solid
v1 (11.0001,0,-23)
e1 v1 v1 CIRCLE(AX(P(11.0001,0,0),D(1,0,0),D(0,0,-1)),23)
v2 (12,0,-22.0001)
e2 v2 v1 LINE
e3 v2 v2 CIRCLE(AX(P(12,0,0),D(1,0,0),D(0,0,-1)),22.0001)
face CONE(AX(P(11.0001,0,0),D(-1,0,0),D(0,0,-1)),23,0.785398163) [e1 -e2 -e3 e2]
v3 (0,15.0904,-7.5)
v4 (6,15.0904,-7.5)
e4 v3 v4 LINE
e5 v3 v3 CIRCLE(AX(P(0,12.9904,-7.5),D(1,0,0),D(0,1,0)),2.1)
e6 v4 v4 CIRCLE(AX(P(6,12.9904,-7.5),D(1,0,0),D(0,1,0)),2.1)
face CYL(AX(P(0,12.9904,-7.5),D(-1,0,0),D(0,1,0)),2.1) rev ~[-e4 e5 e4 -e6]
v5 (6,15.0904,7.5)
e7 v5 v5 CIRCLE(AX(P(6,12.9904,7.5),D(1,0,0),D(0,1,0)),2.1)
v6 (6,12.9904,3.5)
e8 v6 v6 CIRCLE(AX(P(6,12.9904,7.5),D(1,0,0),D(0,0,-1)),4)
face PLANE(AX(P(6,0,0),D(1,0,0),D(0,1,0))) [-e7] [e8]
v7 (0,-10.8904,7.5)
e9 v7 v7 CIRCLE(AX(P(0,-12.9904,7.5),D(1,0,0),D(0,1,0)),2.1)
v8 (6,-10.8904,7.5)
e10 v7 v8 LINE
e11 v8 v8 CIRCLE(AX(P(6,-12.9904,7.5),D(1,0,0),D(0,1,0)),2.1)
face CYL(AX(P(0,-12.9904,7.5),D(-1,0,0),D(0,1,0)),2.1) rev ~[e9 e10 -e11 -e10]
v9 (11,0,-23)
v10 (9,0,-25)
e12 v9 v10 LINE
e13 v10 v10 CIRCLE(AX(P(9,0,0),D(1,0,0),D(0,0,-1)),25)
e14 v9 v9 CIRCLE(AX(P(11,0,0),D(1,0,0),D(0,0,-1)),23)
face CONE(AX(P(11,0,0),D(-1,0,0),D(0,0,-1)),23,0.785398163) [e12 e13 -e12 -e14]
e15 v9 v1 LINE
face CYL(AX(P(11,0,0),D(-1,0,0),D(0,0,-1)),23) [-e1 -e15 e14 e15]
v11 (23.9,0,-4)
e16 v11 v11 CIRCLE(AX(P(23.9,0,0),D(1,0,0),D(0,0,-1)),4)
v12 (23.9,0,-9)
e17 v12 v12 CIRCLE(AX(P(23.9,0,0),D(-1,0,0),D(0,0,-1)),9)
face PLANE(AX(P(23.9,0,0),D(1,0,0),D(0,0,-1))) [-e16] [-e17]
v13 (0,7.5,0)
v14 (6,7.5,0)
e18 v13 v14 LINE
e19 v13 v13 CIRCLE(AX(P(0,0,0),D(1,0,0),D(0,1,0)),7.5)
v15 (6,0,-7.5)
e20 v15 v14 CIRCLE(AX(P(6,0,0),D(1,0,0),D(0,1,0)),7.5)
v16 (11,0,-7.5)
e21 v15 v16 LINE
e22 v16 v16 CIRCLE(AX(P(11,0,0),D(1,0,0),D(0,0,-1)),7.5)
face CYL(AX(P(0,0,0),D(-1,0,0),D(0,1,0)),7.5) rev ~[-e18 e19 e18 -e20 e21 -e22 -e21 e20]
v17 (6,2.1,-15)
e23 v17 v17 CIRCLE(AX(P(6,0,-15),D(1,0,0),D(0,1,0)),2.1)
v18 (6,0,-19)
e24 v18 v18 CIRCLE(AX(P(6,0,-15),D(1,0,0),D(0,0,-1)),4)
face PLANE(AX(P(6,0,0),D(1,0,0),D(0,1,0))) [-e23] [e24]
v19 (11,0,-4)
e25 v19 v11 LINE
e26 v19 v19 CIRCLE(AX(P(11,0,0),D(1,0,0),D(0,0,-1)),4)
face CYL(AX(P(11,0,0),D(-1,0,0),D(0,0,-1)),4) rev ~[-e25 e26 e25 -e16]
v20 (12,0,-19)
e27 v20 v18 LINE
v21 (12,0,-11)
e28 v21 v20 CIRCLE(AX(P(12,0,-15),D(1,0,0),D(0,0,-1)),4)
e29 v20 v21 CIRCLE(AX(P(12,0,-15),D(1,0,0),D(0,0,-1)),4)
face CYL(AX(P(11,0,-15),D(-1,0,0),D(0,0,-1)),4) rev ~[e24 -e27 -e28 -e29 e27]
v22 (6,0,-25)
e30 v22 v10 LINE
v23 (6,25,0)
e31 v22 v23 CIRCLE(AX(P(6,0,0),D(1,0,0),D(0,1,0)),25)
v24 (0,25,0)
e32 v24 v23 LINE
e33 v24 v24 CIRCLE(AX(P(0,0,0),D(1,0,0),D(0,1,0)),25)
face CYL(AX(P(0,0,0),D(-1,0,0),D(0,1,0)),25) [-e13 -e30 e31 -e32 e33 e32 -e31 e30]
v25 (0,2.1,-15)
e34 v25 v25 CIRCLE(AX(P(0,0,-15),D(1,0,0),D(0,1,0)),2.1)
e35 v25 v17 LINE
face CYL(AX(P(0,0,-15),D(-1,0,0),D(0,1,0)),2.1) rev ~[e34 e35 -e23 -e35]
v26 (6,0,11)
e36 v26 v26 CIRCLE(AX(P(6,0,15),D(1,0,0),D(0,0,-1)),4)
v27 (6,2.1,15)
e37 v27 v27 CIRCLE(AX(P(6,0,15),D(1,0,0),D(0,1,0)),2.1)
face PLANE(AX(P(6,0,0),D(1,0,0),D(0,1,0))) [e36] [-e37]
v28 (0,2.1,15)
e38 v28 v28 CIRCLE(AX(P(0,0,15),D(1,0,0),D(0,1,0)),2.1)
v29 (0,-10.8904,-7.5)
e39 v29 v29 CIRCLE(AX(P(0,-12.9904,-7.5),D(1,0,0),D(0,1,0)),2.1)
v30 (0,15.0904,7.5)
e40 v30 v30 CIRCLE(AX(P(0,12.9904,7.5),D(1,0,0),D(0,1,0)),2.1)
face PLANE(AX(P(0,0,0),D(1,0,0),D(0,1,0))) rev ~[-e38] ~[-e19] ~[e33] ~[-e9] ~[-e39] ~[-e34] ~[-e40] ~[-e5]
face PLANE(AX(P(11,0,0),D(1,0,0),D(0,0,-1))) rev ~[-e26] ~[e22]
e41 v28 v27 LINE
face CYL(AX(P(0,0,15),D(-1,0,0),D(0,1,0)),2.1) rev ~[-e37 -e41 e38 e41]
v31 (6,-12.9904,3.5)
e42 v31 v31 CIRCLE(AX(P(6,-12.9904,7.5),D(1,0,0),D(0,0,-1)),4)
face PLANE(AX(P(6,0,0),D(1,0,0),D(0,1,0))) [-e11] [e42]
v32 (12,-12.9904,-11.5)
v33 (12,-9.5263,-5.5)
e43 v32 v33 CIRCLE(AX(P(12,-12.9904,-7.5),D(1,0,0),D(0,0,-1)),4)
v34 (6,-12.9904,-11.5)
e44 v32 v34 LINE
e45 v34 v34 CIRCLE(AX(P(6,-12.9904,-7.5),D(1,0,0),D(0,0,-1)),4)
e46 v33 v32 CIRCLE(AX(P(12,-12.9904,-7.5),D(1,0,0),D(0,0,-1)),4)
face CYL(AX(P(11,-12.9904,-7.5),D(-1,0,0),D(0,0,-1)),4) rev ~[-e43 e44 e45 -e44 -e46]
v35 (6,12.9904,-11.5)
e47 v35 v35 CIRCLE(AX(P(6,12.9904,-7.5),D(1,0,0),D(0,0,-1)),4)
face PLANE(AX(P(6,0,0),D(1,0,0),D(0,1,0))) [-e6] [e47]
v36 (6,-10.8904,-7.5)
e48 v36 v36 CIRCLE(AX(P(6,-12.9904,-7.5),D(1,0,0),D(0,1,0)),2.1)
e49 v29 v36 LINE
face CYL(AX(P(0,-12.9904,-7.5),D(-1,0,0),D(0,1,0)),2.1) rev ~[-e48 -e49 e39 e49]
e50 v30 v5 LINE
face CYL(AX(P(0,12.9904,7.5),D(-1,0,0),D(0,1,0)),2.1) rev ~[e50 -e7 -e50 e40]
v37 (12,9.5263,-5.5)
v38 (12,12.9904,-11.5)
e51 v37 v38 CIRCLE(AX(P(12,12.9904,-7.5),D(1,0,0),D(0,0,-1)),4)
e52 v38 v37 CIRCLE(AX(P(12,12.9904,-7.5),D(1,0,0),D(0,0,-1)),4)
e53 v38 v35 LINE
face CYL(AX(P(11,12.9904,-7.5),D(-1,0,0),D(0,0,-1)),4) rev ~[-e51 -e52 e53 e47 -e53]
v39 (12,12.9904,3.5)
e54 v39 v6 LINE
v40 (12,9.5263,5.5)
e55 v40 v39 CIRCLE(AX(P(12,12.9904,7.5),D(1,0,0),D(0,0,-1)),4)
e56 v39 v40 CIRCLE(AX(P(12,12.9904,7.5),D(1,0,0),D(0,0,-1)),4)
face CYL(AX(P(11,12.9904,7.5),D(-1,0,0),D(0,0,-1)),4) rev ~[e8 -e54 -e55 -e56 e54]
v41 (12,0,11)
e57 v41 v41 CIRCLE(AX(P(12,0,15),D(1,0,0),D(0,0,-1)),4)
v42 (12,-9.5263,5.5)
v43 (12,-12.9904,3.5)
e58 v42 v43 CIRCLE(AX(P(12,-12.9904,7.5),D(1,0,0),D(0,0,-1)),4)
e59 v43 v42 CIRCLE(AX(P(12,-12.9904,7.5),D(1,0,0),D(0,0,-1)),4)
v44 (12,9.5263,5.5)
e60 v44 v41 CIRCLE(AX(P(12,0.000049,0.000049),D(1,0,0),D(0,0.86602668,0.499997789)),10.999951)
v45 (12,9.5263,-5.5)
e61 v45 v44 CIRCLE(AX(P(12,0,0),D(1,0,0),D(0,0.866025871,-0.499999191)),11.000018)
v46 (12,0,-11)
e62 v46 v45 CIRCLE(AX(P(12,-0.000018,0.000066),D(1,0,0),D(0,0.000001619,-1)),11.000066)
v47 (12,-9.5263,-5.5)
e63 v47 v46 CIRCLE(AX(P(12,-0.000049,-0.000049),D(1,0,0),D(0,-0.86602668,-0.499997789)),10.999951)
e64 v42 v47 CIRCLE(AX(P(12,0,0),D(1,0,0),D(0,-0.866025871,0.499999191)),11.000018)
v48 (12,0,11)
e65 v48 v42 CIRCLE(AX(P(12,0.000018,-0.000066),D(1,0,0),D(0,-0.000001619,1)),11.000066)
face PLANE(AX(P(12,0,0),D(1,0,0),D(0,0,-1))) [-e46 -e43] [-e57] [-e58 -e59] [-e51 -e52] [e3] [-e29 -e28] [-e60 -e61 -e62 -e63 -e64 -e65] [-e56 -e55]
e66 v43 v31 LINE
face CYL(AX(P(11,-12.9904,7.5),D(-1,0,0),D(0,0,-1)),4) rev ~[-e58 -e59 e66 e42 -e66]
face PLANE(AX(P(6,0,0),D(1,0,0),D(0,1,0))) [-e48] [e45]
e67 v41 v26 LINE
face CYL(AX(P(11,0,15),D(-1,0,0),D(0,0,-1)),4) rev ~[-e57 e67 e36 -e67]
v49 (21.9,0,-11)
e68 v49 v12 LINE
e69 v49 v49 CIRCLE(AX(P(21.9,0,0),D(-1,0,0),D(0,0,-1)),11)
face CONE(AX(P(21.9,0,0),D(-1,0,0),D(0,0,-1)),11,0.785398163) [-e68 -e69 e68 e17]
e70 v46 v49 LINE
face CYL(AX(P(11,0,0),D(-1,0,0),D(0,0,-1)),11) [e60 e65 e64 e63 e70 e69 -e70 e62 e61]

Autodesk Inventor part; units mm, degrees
ref_plane "YZ Plane" through (0, 0, 0) normal (1, 0, 0) x (0, 1, 0)
ref_plane "XZ Plane" through (0, 0, 0) normal (0, 1, 0) x (-1, 0, 0)
ref_plane "XY Plane" through (0, 0, 0) normal (0, 0, 1) x (1, 0, 0)
sketch "草图1" plane through (0, 0, 0) normal (1, 0, 0) x (0, 1, 0)
  circle A0 centre (0, 0) radius 25
  circle A1 centre (0, 0) radius 7.5
  circle A2 centre (0, 0) radius 15 construction
  circle A3 centre (0, -15) radius 2.1
  line L0 (0, 0) -> (0, -7.5) construction
  circle A4 centre (12.9904, -7.5) radius 2.1
  circle A5 centre (12.9904, 7.5) radius 2.1
  circle A6 centre (0, 15) radius 2.1
  circle A7 centre (-12.9904, 7.5) radius 2.1
  circle A8 centre (-12.9904, -7.5) radius 2.1
  dimension "d1" = 15
  dimension "d4" = 30
  dimension "d0" = 50
  dimension "d5" = 4.2
  dimension "d8" = 360
extrude "拉伸1" add sketch "草图1" along normal blind 6
sketch "草图2" plane through (6, 0, 0) normal (1, 0, 0) x (0, 0, -1)
  circle A0 centre (0, 0) radius 25 projected
  circle A1 centre (7.5, 12.9904) radius 2.1 projected
  circle A2 centre (15, 0) radius 2.1 projected
  circle A3 centre (7.5, -12.9904) radius 2.1 projected
  circle A4 centre (-7.5, -12.9904) radius 2.1 projected
  circle A5 centre (0, 0) radius 7.5 projected
  circle A6 centre (-15, 0) radius 2.1 projected
  circle A7 centre (-7.5, 12.9904) radius 2.1 projected
  circle A8 centre (15, 0) radius 4
  circle A9 centre (7.5, 12.9904) radius 4
  circle A10 centre (-7.5, 12.9904) radius 4
  circle A11 centre (-15, 0) radius 4
  circle A12 centre (-7.5, -12.9904) radius 4
  circle A13 centre (7.5, -12.9904) radius 4
  dimension "d10" = 8
  dimension "d13" = 360
extrude "拉伸2" add sketch "草图2" along normal blind 5 contours A0
sketch "草图3" plane through (11, 0, 0) normal (1, 0, 0) x (0, 0, -1)
  circle A0 centre (0, 0) radius 4
  circle A1 centre (0, 0) radius 25 projected
  circle A2 centre (7.5, -12.9904) radius 4 projected
  circle A3 centre (15, 0) radius 4 projected
  circle A4 centre (7.5, 12.9904) radius 4 projected
  circle A5 centre (-7.5, 12.9904) radius 4 projected
  circle A6 centre (-15, 0) radius 4 projected
  circle A7 centre (-7.5, -12.9904) radius 4 projected
  circle A8 centre (0, 0) radius 11
  dimension "d17" = 8
extrude "拉伸3" add sketch "草图3" along normal blind 12.9 contours A8
chamfer "倒角1" distance 2 angle 45 1 edges at (23.9, 0, 11)
chamfer "倒角2" distance 2 angle 45 1 edges at (11, 0, 25)
sketch "草图4" plane through (11, 0, 0) normal (1, 0, 0) x (0, 0, -1)
  circle A0 centre (-15, 0) radius 4 projected
  arc A1 (-5.5, 9.5263) -> (-11, 0) centre (0, 0) ccw projected
  circle A2 centre (-7.5, 12.9904) radius 4 projected
  arc A3 (5.5, 9.5263) -> (-5.5, 9.5263) centre (0, 0) ccw projected
  circle A4 centre (7.5, 12.9904) radius 4 projected
  arc A5 (11, 0) -> (5.5, 9.5263) centre (0, 0) ccw projected
  circle A6 centre (15, 0) radius 4 projected
  arc A7 (5.5, -9.5263) -> (11, 0) centre (0, 0) ccw projected
  circle A8 centre (7.5, -12.9904) radius 4 projected
  arc A9 (-5.5, -9.5263) -> (5.5, -9.5263) centre (0, 0) ccw projected
  circle A10 centre (-7.5, -12.9904) radius 4 projected
  arc A11 (-11, 0) -> (-5.5, -9.5263) centre (0, 0) ccw projected
  circle A12 centre (0, 0) radius 23 projected
extrude "拉伸4" add sketch "草图4" along normal blind 1
chamfer "倒角3" distance 1 angle 45 1 edges at (12, 0, 23)
properties part number "导轮架"
